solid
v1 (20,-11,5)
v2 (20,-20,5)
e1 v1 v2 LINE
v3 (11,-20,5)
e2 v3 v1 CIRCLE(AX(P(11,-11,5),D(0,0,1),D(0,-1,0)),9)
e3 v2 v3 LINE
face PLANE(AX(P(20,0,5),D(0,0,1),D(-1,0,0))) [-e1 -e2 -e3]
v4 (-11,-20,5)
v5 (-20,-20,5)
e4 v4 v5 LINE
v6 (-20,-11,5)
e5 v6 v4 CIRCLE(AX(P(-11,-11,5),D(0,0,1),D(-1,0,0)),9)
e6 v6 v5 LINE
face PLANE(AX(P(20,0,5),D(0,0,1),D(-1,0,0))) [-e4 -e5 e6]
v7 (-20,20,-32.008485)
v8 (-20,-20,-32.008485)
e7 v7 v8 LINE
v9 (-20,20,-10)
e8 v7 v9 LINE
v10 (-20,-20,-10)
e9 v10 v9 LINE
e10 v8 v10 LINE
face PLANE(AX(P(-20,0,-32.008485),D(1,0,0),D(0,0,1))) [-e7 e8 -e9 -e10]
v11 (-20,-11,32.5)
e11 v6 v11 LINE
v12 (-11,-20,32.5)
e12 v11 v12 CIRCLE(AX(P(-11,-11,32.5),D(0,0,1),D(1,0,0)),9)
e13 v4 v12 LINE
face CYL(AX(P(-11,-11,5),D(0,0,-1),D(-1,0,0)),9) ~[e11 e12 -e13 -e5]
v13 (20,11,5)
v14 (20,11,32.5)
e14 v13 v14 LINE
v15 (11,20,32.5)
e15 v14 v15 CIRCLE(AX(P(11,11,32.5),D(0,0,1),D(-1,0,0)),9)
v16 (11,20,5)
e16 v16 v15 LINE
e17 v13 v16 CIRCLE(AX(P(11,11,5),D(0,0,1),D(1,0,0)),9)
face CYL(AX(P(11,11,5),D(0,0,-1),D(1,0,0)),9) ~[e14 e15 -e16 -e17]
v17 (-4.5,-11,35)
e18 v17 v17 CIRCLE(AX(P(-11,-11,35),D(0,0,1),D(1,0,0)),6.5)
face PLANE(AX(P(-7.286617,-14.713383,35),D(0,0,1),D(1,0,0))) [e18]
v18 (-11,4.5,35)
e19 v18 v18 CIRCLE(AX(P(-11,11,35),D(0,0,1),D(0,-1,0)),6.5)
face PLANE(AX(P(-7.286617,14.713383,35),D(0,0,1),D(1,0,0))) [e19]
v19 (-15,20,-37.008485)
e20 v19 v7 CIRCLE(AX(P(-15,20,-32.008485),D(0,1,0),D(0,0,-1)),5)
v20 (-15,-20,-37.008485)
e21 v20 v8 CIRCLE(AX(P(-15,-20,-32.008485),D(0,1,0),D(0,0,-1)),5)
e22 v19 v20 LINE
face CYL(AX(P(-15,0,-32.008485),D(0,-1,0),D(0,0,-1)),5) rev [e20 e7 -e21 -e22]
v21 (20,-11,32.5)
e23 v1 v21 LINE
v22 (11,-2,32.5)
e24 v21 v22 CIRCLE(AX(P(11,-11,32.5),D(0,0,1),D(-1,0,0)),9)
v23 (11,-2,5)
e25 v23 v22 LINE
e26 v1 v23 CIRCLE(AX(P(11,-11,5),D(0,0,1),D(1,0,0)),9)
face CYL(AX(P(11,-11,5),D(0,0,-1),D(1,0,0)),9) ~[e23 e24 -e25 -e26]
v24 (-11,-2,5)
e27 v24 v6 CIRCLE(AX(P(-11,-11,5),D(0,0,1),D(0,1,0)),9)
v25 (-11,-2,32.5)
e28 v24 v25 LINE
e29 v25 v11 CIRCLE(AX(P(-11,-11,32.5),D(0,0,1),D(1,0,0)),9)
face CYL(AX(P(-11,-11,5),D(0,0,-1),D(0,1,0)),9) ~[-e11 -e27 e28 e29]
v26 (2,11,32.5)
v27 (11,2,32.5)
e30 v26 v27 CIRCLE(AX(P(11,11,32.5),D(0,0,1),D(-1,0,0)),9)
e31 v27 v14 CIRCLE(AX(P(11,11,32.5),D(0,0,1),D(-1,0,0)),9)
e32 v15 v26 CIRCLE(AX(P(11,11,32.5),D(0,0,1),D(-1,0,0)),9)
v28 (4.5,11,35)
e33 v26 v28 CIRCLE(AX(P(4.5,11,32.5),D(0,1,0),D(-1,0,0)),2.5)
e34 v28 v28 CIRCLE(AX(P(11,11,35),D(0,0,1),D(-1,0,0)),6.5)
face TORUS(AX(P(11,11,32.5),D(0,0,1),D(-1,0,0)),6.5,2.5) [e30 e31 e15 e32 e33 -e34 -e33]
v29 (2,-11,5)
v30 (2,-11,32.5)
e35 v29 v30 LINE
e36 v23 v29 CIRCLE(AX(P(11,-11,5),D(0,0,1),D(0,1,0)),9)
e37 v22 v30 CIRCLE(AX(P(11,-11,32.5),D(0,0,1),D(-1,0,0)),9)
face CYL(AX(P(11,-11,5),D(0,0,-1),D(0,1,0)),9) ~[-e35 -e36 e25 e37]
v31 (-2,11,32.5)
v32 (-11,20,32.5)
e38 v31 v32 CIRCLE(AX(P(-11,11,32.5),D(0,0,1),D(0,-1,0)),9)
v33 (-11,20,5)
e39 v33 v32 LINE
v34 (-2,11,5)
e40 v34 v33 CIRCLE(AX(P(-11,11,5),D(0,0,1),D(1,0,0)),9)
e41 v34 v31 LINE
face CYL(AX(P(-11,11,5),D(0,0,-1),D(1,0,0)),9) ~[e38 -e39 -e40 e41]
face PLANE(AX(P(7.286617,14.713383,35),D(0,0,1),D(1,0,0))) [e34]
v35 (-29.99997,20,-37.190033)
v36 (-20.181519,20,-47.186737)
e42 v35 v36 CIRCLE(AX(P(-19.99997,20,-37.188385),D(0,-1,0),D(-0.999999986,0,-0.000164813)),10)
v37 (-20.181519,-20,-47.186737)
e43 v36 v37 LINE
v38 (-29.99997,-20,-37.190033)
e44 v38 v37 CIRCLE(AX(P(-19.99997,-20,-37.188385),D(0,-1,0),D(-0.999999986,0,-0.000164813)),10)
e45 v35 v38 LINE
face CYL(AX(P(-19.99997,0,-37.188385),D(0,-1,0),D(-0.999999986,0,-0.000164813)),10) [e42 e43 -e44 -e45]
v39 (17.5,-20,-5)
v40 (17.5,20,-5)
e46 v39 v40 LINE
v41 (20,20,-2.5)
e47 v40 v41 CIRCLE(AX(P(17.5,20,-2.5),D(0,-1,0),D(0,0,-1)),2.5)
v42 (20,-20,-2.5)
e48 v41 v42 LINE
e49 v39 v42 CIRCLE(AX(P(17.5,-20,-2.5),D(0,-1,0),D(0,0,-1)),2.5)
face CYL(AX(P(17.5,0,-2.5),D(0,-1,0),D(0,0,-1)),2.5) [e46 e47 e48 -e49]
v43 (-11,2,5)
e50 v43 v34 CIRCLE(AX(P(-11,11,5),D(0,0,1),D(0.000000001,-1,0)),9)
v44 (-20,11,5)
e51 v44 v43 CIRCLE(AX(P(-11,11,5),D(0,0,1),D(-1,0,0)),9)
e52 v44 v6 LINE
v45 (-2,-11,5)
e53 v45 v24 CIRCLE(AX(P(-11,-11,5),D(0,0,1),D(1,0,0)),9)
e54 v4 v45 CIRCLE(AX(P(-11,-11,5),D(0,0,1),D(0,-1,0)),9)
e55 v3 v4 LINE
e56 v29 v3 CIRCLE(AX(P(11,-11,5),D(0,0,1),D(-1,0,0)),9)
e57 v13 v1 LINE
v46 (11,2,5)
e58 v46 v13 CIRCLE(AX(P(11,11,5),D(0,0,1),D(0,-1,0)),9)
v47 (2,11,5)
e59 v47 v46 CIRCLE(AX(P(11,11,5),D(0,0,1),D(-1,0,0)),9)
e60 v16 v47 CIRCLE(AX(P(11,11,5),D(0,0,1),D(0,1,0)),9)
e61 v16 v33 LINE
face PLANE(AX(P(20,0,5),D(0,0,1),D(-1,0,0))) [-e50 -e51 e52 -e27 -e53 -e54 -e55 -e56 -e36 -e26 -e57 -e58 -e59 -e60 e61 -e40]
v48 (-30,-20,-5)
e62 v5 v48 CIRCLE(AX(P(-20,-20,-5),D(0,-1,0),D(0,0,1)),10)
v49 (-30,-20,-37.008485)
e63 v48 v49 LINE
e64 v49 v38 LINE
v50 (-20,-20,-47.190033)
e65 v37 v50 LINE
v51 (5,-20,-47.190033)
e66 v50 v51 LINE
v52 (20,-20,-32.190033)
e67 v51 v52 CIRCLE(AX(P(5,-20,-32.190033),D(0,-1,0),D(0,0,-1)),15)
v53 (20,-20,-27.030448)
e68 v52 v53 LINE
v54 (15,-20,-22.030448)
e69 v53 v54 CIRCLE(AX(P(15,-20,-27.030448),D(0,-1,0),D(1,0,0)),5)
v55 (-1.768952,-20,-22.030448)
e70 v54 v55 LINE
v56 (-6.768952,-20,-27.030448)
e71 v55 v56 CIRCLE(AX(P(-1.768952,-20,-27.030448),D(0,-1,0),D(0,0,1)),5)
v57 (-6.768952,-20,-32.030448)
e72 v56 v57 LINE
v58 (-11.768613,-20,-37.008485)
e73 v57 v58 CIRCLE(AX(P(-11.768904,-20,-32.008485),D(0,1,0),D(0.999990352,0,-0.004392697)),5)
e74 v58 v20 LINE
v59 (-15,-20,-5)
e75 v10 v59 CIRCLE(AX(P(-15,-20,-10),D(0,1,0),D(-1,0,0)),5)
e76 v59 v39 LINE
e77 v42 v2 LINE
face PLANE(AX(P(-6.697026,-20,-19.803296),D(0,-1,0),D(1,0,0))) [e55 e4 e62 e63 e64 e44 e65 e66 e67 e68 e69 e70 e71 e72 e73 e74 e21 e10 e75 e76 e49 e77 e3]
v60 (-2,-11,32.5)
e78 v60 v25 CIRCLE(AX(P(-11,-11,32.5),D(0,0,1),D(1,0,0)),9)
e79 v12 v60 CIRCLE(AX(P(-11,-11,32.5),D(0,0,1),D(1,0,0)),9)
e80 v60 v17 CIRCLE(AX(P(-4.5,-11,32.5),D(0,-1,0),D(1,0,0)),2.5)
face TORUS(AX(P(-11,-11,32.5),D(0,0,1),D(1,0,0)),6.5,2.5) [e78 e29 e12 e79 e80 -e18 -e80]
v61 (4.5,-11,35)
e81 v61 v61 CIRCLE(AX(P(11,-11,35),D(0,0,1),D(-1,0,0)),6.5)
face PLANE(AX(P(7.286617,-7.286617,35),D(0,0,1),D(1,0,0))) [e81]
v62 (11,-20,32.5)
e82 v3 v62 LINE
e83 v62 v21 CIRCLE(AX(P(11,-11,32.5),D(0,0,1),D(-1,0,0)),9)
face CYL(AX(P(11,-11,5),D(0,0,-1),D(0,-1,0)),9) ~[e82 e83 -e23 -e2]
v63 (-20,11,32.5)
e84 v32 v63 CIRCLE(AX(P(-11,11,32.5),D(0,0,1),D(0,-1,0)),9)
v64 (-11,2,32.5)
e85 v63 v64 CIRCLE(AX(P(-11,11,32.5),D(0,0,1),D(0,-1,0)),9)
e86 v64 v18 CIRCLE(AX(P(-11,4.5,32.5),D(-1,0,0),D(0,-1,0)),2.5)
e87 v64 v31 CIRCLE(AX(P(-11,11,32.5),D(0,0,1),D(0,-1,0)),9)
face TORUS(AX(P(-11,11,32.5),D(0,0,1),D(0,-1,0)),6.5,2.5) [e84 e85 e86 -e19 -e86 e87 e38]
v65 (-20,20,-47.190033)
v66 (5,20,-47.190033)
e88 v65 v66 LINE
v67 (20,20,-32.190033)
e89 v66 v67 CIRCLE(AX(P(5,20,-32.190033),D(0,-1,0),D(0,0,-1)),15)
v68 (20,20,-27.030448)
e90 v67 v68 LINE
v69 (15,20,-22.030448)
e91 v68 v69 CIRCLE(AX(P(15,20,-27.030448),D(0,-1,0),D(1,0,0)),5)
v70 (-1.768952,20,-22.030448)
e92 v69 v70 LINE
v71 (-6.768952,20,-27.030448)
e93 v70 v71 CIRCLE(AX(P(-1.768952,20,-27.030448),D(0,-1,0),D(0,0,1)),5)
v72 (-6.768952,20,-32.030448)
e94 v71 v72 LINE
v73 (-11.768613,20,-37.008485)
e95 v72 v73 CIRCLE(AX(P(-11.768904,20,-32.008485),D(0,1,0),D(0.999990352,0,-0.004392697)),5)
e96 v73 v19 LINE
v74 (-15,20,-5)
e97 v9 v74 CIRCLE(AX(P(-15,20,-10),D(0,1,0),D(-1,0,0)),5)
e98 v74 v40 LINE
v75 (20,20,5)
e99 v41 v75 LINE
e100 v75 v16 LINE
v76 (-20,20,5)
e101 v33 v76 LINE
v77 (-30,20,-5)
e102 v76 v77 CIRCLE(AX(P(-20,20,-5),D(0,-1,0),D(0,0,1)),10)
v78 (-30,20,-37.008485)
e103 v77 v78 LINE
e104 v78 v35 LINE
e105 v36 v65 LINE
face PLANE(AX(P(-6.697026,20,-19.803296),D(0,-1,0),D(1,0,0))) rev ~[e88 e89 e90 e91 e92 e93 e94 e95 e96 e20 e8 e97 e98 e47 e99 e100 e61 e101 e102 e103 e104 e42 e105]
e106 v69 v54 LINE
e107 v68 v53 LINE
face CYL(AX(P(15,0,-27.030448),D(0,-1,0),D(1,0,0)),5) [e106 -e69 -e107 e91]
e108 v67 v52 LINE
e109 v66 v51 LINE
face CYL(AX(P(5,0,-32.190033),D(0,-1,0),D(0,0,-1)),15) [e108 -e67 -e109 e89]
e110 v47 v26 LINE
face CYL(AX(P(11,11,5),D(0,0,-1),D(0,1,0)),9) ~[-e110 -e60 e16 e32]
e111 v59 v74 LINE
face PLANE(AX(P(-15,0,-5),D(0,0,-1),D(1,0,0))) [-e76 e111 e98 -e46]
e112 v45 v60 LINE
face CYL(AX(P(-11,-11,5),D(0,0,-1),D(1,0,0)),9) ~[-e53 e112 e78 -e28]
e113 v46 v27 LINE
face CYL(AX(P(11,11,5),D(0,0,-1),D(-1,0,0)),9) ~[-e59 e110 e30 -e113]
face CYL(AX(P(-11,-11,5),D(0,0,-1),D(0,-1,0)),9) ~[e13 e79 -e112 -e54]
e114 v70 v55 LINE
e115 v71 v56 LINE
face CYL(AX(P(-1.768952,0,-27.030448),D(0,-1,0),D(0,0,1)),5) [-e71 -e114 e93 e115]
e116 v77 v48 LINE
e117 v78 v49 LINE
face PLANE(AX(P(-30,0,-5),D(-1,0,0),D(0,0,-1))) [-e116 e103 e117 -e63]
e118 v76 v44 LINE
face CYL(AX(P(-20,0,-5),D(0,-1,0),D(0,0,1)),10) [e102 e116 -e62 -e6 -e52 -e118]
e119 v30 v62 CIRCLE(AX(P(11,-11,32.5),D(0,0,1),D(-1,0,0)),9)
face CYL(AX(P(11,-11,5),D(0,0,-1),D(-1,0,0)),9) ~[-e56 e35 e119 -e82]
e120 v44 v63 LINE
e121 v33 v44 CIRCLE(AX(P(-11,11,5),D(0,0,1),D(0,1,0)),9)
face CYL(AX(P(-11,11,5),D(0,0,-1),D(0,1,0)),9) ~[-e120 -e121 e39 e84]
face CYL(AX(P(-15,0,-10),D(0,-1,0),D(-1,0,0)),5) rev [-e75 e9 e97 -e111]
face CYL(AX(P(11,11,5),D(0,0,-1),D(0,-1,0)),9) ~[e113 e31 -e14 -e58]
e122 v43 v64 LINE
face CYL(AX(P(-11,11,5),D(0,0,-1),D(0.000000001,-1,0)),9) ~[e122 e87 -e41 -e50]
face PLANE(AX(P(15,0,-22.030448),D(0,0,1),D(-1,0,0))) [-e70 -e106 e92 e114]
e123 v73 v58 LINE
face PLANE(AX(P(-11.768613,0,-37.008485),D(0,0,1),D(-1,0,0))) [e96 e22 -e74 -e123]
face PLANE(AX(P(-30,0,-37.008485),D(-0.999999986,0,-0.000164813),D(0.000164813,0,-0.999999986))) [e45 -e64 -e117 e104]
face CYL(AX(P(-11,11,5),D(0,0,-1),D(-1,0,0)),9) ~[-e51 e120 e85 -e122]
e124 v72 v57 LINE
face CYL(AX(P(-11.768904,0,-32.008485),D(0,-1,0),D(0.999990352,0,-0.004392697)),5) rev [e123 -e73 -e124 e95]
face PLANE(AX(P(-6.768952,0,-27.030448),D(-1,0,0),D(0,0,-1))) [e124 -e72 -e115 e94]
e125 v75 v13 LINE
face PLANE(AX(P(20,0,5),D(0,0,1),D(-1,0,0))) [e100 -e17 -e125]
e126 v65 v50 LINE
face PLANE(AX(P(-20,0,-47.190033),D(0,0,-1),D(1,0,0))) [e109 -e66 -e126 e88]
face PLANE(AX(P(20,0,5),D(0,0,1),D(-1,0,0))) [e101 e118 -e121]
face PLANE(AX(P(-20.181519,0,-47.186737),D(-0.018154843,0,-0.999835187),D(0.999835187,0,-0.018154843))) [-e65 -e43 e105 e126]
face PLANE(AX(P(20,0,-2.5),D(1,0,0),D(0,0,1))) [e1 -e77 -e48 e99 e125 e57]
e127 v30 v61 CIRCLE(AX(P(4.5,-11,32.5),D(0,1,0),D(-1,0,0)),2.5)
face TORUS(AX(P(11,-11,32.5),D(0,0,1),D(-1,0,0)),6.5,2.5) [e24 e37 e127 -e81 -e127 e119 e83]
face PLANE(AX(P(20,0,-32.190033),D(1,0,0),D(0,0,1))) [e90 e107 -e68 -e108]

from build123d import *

# Parameters (mm, degrees)
F1_DEPTH = 20
F3_DEPTH = 30


# Not quite as in the source:
# - a fillet or chamfer that OpenCascade refuses, or shapes differently, is made with other operations: its cross-section is extruded or revolved along the edge and cut away or added
# - a feature names something its author has since deleted; it is built from what else it names


with BuildPart() as f1:
    # F0 (on Front) → F1 (new body, symmetric)
    with BuildSketch(Plane.XZ):
        with BuildLine():
            Line((-10, -5), (17.5, -5))
            ThreePointArc((17.5, -5), (19.267766953, -4.267766953), (20, -2.5))
            Line((20, -2.5), (20, 5))
            Line((20, 5), (-20, 5))
            ThreePointArc((-20, 5), (-27.0710678119, 2.0710678119), (-30, -5))
            Line((-30, -5), (-30, -37.0084848255))
            Line((-30, -37.0084848255), (-29.9999700785, -37.1900333921))
            ThreePointArc((-29.9999700785, -37.1900333921), (-27.134358967, -44.1955599538), (-20.1815186475, -47.1867371371))
            Line((-20.1815186475, -47.1867371371), (-20, -47.1900331229))
            Line((-20, -47.1900331229), (-10, -47.1900331229))
            Line((-10, -47.1900331229), (-6.8265195005, -47.1900331229))
            Line((-6.8265195005, -47.1900331229), (5, -47.1900331229))
            ThreePointArc((5, -47.1900331229), (15.6066017178, -42.7966348407), (20, -32.1900331229))
            Line((20, -32.1900331229), (20, -32.0304483175))
            Line((20, -32.0304483175), (20, -27.0304483175))
            ThreePointArc((20, -27.0304483175), (18.5355339059, -23.4949144116), (15, -22.0304483175))
            Line((15, -22.0304483175), (3.1734804995, -22.0304483175))
            Line((3.1734804995, -22.0304483175), (-1.7689520504, -22.0304483175))
            ThreePointArc((-1.7689520504, -22.0304483175), (-5.3044859563, -23.4949144116), (-6.7689520504, -27.0304483175))
            Line((-6.7689520504, -27.0304483175), (-6.7689520504, -32.0304483175))
            ThreePointArc((-6.7689520504, -32.0304483175), (-8.2410406124, -35.5516728412), (-11.7686128262, -37.0084848255))
            Line((-11.7686128262, -37.0084848255), (-15, -37.0084848255))
            ThreePointArc((-15, -37.0084848255), (-18.5355339059, -35.5440187314), (-20, -32.0084848255))
            Line((-20, -32.0084848255), (-20, -15))
            Line((-20, -15), (-20, -10))
            ThreePointArc((-20, -10), (-18.5355339059, -6.4644660941), (-15, -5))
            Line((-15, -5), (-10, -5))
        make_face()
    extrude(amount=F1_DEPTH, both=True)

    # F2 (on face) → F3 (join)
    with BuildSketch(Plane.XY.offset(5)):
        with BuildLine():
            Line((-11, 11), (-2, 11))
            ThreePointArc((-2, 11), (-4.6360389693, 17.3639610307), (-11, 20))
            Line((-11, 20), (-11, 11))
        make_face()
        with BuildLine():
            Line((-20, 11), (-11, 11))
            Line((-11, 11), (-11, 20))
            ThreePointArc((-11, 20), (-17.3639610307, 17.3639610307), (-20, 11))
        make_face()
        with BuildLine():
            ThreePointArc((-20, 11), (-17.3639610288, 4.6360389675), (-10.9999999948, 2))
            Line((-11, 2), (-11, 11))
            Line((-11, 11), (-20, 11))
        make_face()
        with BuildLine():
            Line((-11, 11), (-11, 2))
            ThreePointArc((-10.9999999948, 2), (-4.6360389675, 4.6360389712), (-2, 11))
            Line((-2, 11), (-11, 11))
        make_face()
        with BuildLine():
            ThreePointArc((11, 20), (4.6360389693, 17.3639610307), (2, 11))
            Line((2, 11), (11, 11))
            Line((11, 11), (11, 20))
        make_face()
        with BuildLine():
            Line((11, 20), (11, 11))
            Line((11, 11), (20, 11))
            ThreePointArc((20, 11), (17.3639610307, 17.3639610307), (11, 20))
        make_face()
        with BuildLine():
            Line((11, 11), (11, 2))
            ThreePointArc((11, 2), (17.3639610307, 4.6360389693), (20, 11))
            Line((20, 11), (11, 11))
        make_face()
        with BuildLine():
            ThreePointArc((2, 11), (4.6360389693, 4.6360389693), (11, 2))
            Line((11, 2), (11, 11))
            Line((11, 11), (2, 11))
        make_face()
        with BuildLine():
            ThreePointArc((11, -2), (4.6360389693, -4.6360389693), (2, -11))
            Line((2, -11), (11, -11))
            Line((11, -11), (11, -2))
        make_face()
        with BuildLine():
            Line((11, -2), (11, -11))
            Line((11, -11), (20, -11))
            ThreePointArc((20, -11), (17.3639610307, -4.6360389693), (11, -2))
        make_face()
        with BuildLine():
            Line((11, -11), (11, -20))
            ThreePointArc((11, -20), (17.3639610307, -17.3639610307), (20, -11))
            Line((20, -11), (11, -11))
        make_face()
        with BuildLine():
            Line((11, -11), (2, -11))
            ThreePointArc((2, -11), (4.6360389693, -17.3639610307), (11, -20))
            Line((11, -20), (11, -11))
        make_face()
        with BuildLine():
            ThreePointArc((-11, -20), (-4.6360389693, -17.3639610307), (-2, -11))
            Line((-2, -11), (-11, -11))
            Line((-11, -11), (-11, -20))
        make_face()
        with BuildLine():
            ThreePointArc((-20, -11), (-17.3639610307, -17.3639610307), (-11, -20))
            Line((-11, -20), (-11, -11))
            Line((-11, -11), (-20, -11))
        make_face()
        with BuildLine():
            Line((-20, -11), (-11, -11))
            Line((-11, -11), (-11, -2))
            ThreePointArc((-11, -2), (-17.3639610307, -4.6360389693), (-20, -11))
        make_face()
        with BuildLine():
            Line((-11, -11), (-2, -11))
            ThreePointArc((-2, -11), (-4.6360389693, -4.6360389693), (-11, -2))
            Line((-11, -2), (-11, -11))
        make_face()
    extrude(amount=F3_DEPTH)

    # F4: fillet of radius 2.5 on 4 edges, made by hand

    # F4_s1 → F4_t2 (revolve, cut)
    with BuildSketch(Plane.YZ.offset(-11)):
        with BuildLine():
            ThreePointArc((2, 32.5), (2.732233047, 34.267766953), (4.5, 35))
            Line((4.5, 35), (2, 35))
            Line((2, 35), (2, 32.5))
        make_face()
    revolve(axis=Axis((-11, 11, 35), (0, 0, 1)), mode=Mode.SUBTRACT)

    # F4_s3 → F4_t4 (revolve, cut)
    with BuildSketch(Plane.XZ.offset(-11)):
        with BuildLine():
            ThreePointArc((2, 32.5), (2.732233047, 34.267766953), (4.5, 35))
            Line((4.5, 35), (2, 35))
            Line((2, 35), (2, 32.5))
        make_face()
    revolve(axis=Axis((11, 11, 35), (0, 0, 1)), mode=Mode.SUBTRACT)

    # F4_s5 → F4_t6 (revolve, cut)
    with BuildSketch(Plane.XZ.offset(11)):
        with BuildLine():
            ThreePointArc((2, 32.5), (2.732233047, 34.267766953), (4.5, 35))
            Line((4.5, 35), (2, 35))
            Line((2, 35), (2, 32.5))
        make_face()
    revolve(axis=Axis((11, -11, 35), (0, 0, 1)), mode=Mode.SUBTRACT)

    # F4_s7 → F4_t8 (revolve, cut)
    with BuildSketch(Plane.XZ.offset(11)):
        with BuildLine():
            ThreePointArc((-2, 32.5), (-2.732233047, 34.267766953), (-4.5, 35))
            Line((-4.5, 35), (-2, 35))
            Line((-2, 35), (-2, 32.5))
        make_face()
    revolve(axis=Axis((-11, -11, 35), (0, 0, 1)), mode=Mode.SUBTRACT)


solid = f1.part
